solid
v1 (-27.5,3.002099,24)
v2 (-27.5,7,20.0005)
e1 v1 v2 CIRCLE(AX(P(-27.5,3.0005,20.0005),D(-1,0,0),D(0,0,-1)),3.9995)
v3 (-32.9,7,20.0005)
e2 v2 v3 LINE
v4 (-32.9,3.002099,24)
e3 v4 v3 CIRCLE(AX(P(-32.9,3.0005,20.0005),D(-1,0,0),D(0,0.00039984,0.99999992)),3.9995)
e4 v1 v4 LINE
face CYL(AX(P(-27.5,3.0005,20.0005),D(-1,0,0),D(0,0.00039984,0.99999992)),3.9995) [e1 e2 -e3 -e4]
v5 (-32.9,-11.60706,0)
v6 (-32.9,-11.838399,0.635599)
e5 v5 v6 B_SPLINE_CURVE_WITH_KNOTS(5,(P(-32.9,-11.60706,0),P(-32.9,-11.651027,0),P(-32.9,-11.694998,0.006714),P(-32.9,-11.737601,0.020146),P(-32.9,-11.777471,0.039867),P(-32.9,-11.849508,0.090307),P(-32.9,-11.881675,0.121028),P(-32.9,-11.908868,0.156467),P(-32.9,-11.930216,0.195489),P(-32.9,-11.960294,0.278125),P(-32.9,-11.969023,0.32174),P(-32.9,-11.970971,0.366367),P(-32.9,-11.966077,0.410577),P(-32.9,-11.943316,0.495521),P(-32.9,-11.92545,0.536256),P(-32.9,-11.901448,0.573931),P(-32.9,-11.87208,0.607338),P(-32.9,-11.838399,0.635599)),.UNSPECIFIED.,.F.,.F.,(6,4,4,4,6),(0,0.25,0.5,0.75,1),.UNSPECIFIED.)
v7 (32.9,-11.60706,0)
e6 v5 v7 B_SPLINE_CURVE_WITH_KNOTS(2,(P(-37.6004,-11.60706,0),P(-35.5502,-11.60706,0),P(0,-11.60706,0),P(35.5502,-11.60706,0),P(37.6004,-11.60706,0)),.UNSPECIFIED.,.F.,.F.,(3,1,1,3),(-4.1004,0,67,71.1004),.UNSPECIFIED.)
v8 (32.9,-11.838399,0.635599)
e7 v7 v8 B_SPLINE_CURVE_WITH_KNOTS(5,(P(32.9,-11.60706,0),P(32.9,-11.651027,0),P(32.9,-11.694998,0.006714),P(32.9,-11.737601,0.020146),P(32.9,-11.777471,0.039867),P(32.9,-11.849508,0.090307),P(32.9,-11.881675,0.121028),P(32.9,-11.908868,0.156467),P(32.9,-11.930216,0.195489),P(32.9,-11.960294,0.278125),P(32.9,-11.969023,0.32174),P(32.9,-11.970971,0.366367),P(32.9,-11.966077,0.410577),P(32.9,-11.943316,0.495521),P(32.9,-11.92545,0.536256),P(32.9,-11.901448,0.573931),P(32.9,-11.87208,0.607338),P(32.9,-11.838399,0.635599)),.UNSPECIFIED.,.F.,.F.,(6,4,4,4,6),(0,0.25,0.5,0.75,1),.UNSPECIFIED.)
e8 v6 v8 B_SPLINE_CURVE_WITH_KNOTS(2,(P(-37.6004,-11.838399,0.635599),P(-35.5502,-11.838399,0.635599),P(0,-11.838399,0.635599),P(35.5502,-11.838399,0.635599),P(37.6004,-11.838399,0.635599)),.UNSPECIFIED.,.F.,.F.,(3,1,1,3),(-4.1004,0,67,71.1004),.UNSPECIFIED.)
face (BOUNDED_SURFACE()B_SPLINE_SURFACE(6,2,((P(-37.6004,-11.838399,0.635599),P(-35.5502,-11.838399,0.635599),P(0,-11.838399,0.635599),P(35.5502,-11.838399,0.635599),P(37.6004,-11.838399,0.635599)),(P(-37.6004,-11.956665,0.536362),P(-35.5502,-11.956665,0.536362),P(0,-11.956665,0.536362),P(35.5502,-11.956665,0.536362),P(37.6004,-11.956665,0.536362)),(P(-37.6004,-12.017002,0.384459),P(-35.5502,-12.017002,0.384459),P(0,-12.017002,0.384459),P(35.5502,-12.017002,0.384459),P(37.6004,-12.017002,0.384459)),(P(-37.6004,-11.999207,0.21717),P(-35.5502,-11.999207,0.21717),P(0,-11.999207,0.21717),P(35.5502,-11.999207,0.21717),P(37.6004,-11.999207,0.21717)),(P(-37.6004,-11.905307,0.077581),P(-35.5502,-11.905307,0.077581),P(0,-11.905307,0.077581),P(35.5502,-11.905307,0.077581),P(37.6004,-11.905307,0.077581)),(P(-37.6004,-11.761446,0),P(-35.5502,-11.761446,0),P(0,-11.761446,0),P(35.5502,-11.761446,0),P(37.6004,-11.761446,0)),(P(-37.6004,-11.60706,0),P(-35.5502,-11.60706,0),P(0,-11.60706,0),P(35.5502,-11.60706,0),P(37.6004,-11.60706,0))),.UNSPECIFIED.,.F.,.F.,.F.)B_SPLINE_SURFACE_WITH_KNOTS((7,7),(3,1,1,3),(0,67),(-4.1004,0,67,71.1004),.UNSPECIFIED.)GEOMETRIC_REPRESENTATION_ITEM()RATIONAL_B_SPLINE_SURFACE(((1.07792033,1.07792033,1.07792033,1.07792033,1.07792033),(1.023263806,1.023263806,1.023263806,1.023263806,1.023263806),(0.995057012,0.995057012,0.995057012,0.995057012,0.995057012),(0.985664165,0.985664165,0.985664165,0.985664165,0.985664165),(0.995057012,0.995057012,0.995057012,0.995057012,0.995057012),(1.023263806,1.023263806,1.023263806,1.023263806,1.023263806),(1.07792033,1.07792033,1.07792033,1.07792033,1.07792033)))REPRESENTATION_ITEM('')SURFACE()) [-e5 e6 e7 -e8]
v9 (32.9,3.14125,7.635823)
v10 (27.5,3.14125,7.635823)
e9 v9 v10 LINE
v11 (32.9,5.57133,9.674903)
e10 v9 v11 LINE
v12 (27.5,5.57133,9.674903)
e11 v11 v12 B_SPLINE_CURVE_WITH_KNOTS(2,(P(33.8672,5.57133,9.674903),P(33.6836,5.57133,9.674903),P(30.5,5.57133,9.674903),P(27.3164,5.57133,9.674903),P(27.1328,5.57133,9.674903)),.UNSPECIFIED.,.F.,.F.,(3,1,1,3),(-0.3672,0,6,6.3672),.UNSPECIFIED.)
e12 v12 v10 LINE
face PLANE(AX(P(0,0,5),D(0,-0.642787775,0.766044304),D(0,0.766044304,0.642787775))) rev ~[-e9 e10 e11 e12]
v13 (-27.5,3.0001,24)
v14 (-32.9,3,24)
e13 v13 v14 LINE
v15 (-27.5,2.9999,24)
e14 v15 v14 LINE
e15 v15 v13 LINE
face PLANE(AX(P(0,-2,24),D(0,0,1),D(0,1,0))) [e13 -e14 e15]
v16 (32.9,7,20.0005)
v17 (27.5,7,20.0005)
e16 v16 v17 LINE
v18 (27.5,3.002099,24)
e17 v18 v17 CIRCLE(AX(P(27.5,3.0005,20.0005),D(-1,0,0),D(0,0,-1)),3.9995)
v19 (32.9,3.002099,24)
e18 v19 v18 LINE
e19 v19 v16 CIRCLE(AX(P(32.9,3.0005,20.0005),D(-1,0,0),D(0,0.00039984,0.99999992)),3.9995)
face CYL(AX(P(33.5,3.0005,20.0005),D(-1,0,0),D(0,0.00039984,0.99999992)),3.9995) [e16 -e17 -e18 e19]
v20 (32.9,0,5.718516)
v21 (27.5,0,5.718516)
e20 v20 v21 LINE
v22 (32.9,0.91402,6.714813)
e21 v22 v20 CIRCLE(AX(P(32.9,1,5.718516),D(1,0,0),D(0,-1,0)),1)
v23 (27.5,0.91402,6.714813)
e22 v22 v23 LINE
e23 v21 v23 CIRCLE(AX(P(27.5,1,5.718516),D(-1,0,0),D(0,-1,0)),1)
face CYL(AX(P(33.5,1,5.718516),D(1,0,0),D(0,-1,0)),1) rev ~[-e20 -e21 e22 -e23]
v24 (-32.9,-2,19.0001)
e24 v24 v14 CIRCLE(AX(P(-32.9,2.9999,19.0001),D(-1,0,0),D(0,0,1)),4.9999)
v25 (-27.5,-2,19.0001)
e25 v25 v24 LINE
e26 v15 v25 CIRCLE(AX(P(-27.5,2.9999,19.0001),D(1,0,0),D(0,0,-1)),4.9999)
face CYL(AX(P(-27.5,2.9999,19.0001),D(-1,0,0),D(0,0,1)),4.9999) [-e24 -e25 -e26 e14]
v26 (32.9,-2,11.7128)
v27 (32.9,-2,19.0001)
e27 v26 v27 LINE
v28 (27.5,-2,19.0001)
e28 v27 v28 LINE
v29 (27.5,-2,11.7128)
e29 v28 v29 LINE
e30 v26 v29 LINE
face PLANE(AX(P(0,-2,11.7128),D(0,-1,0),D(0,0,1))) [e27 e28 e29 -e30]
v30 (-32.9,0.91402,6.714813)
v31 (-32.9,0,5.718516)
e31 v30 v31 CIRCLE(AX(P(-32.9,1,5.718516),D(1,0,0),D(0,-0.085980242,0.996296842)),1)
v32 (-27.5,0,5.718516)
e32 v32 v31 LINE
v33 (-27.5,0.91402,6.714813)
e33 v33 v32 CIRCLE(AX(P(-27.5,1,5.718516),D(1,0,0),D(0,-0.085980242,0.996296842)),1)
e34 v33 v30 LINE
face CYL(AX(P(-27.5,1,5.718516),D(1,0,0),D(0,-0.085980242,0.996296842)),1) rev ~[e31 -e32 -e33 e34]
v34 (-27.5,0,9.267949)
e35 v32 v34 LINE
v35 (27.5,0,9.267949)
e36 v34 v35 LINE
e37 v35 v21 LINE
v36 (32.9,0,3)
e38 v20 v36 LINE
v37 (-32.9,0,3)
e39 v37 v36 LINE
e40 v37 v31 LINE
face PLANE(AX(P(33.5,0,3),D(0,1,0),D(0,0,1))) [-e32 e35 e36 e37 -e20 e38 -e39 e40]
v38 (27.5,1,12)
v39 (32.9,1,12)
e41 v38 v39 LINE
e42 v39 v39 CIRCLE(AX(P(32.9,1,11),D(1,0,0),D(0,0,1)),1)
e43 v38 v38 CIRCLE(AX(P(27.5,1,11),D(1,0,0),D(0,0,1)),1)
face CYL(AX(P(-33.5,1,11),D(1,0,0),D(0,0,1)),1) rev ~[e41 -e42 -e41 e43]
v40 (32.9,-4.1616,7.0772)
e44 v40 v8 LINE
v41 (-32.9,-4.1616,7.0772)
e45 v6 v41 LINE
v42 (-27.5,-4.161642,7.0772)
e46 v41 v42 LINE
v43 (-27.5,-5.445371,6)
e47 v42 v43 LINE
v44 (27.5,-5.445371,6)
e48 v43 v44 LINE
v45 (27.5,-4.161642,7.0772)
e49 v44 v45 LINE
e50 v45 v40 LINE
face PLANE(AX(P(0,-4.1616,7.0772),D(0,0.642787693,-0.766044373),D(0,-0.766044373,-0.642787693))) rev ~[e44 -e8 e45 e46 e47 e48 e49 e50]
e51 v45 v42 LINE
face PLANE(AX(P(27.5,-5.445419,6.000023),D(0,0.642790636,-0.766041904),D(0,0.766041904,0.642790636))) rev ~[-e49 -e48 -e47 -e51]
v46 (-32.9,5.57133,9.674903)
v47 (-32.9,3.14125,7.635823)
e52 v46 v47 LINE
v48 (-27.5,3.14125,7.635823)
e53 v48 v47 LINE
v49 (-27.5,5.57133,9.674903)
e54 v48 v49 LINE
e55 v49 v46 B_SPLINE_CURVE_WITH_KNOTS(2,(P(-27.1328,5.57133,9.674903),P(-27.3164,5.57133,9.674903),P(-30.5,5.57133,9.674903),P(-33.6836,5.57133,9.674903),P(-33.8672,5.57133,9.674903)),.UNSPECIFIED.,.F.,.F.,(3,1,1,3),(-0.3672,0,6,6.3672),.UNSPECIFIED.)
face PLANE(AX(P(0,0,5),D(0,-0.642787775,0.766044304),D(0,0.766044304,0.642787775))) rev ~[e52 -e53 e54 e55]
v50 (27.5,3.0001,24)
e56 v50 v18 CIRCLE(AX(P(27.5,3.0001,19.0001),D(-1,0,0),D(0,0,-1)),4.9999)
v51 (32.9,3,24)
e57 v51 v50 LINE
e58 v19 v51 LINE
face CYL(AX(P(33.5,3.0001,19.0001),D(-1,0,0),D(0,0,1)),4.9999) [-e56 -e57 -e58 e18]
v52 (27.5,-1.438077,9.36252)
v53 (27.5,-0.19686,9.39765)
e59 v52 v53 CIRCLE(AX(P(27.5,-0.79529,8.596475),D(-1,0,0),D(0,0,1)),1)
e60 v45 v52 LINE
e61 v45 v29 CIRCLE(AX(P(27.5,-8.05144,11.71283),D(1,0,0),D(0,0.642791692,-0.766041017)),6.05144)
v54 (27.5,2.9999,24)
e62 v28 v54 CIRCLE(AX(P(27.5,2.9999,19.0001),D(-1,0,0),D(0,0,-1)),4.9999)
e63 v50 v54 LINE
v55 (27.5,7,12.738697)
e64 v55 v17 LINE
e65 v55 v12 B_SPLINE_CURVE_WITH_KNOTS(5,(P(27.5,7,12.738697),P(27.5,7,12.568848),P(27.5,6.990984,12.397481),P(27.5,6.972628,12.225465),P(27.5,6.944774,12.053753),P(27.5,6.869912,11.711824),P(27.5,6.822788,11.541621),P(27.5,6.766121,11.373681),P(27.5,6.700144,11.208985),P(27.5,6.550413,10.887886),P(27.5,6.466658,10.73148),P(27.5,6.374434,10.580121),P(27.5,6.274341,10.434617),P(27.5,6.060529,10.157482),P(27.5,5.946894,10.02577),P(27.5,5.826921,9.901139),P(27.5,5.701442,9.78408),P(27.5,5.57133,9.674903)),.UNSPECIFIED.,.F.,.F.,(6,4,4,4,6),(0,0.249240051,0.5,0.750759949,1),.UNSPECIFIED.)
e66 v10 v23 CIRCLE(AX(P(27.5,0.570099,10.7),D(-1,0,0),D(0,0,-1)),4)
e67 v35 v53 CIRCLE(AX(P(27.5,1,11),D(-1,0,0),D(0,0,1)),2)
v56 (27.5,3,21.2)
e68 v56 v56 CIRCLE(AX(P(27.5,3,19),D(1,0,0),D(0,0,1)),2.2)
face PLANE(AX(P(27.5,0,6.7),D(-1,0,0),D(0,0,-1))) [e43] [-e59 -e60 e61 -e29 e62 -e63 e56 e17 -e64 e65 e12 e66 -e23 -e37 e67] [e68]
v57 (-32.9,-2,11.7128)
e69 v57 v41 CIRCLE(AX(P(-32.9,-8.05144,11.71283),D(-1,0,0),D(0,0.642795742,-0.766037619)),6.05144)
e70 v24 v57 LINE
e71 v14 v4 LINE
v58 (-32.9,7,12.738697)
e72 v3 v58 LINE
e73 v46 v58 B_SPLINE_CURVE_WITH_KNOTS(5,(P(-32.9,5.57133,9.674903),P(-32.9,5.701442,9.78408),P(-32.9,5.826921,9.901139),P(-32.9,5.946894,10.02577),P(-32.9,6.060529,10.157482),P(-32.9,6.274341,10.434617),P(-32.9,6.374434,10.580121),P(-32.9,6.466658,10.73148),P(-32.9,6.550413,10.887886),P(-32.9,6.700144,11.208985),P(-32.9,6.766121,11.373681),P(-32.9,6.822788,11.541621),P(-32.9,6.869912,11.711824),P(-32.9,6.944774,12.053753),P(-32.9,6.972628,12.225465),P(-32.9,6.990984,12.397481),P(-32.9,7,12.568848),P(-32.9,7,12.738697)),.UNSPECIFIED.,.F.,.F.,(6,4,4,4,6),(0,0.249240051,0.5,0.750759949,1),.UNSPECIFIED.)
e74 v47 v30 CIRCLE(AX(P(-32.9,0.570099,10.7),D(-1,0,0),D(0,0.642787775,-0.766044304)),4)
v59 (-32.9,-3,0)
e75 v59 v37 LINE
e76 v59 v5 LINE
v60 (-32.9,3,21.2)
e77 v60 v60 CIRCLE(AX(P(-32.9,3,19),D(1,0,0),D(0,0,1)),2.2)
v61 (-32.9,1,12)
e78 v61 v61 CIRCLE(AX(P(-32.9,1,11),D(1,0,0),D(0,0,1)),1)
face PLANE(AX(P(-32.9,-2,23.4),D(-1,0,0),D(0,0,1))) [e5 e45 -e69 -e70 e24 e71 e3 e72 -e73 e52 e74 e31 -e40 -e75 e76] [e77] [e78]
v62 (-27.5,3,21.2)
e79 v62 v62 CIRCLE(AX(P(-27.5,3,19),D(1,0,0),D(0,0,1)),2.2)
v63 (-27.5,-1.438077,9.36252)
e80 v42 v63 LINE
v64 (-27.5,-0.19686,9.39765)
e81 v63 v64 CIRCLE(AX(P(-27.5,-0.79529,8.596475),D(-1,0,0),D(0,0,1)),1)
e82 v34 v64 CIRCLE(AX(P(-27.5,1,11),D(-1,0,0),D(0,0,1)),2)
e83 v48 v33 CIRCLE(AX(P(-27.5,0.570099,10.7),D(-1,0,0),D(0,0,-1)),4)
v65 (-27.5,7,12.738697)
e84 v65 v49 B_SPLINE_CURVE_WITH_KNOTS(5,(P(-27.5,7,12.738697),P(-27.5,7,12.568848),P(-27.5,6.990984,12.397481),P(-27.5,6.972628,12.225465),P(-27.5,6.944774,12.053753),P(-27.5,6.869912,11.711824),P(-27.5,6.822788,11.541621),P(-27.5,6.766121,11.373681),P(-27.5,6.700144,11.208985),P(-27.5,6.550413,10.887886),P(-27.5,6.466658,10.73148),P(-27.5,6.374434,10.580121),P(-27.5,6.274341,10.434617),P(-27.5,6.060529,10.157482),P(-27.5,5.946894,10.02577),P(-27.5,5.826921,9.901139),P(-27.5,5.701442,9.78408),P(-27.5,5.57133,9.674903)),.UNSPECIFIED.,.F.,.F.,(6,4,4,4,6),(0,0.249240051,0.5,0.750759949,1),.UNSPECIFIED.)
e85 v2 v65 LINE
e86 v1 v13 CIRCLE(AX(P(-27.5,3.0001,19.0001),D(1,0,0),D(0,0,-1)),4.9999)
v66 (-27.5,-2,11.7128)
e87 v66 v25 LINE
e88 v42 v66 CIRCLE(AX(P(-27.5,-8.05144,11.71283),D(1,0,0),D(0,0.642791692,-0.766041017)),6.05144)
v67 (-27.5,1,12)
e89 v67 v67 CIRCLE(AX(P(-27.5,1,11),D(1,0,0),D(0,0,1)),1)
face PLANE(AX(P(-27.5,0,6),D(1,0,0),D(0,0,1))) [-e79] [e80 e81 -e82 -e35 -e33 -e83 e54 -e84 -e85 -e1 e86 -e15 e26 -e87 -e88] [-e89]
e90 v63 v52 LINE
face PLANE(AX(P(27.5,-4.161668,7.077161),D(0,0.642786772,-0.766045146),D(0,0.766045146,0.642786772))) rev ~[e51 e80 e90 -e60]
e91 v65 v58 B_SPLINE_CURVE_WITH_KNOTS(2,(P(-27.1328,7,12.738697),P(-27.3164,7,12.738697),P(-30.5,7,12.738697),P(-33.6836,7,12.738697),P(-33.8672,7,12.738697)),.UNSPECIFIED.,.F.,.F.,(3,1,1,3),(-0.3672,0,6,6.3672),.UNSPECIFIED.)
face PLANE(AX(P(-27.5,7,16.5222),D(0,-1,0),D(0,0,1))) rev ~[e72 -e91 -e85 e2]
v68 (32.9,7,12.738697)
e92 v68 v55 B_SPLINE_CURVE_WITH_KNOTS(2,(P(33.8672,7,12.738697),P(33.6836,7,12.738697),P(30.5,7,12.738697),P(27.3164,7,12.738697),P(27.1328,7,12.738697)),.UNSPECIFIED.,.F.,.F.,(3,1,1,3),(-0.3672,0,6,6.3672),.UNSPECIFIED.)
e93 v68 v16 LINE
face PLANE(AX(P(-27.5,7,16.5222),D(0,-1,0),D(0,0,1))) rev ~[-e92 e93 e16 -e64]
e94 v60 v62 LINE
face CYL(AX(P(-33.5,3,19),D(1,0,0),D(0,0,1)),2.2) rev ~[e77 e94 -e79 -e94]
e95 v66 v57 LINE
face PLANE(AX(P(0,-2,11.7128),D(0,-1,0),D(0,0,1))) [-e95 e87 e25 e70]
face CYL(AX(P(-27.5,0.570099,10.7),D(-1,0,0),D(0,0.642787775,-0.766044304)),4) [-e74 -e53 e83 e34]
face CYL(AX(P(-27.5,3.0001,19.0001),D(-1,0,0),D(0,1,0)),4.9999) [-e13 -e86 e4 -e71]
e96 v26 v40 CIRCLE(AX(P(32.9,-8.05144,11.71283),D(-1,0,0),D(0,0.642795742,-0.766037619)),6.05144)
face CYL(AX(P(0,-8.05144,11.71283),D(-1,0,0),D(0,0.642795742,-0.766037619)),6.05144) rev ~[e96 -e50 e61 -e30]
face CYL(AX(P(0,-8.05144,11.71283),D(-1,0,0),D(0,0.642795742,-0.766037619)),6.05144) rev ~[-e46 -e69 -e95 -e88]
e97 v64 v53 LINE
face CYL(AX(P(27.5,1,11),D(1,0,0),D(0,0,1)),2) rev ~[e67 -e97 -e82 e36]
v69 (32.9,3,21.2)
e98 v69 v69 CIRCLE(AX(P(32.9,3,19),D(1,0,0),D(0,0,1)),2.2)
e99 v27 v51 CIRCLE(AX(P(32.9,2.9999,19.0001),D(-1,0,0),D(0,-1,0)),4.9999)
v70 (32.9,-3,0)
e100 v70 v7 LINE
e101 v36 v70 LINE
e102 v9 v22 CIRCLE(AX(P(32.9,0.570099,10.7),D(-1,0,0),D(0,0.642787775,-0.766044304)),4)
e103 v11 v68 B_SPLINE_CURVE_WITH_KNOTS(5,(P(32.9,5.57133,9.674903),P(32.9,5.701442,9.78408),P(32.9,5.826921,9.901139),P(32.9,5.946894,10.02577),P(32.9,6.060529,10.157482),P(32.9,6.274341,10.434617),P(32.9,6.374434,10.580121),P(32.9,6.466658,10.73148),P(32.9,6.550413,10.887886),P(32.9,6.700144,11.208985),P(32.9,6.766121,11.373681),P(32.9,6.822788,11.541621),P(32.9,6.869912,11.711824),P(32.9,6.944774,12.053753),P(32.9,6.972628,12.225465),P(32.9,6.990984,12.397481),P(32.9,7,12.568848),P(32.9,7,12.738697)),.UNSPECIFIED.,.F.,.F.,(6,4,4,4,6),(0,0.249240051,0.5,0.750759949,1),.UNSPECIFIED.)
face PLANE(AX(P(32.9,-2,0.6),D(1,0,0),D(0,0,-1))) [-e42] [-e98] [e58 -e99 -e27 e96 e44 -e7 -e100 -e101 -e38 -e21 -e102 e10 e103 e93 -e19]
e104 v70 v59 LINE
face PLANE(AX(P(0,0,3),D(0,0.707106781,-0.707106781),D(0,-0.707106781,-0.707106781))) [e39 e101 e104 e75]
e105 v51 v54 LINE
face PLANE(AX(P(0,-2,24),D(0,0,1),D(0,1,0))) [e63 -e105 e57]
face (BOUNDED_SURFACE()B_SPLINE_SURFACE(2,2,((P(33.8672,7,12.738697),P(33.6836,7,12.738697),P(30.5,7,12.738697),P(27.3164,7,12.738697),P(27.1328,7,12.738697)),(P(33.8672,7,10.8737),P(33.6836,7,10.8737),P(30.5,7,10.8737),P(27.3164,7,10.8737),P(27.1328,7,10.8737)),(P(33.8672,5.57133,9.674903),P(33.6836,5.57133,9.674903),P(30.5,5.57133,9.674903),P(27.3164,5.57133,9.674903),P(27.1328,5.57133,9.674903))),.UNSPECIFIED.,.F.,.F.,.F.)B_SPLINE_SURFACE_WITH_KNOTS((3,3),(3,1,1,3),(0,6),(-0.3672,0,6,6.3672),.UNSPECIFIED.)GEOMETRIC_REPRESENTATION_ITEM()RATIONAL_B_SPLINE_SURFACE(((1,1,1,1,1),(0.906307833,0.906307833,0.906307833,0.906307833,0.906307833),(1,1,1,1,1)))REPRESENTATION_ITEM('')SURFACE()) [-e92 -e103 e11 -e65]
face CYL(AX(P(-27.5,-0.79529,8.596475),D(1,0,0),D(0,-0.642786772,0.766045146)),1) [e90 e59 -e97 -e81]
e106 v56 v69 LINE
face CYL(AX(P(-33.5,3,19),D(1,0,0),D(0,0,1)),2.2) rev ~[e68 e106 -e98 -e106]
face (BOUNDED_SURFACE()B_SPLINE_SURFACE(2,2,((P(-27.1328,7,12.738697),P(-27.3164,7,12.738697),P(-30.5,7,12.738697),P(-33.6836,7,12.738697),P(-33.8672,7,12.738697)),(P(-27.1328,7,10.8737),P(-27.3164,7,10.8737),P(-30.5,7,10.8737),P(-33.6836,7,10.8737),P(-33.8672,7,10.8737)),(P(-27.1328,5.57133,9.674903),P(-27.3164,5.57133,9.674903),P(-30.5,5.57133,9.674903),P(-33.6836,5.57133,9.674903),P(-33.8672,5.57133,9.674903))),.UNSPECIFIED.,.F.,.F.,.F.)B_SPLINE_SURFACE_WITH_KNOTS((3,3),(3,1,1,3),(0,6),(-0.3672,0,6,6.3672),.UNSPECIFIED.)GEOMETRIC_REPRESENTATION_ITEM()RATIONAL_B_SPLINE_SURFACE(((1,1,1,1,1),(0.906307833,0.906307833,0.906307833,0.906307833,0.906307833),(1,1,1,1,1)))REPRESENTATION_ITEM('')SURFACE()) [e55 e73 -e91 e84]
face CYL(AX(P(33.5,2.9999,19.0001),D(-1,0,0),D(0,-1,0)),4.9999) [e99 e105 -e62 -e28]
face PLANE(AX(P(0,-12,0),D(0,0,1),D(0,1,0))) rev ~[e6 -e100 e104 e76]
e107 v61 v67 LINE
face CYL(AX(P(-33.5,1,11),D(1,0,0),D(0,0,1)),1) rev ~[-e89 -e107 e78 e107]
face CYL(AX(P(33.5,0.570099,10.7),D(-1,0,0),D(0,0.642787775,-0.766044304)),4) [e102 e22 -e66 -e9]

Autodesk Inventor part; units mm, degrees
ref_plane "YZ Plane" through (0, 0, 0) normal (1, 0, 0) x (0, 1, 0)
ref_plane "XZ Plane" through (0, 0, 0) normal (0, 1, 0) x (-1, 0, 0)
ref_plane "XY Plane" through (0, 0, 0) normal (0, 0, 1) x (1, 0, 0)
sketch "Skizze1" plane through (0, 0, 0) normal (1, 0, 0) x (0, 1, 0)
  line L0 (-4.1616, 7.0772) -> (-12, 0.5)
  line L1 (-12, 0) -> (-3, 0)
  line L2 (-12, 0.5) -> (-12, 0)
  line L3 (0, 5) -> (8, 11.7128)
  circle A0 centre (3, 19) radius 0.5
  line L4 (-2, 11.7128) -> (-2, 24)
  line L5 (-2, 24) -> (8, 24)
  line L6 (8, 24) -> (8, 11.7128)
  line L7 (0, 3) -> (-3, 0)
  line L8 (8, 11.7128) -> (-2, 11.7128) construction
  arc A1 (-4.1616, 7.0772) -> (-2, 11.7128) centre (-8.0514, 11.7128) ccw
  line L9 (0, 5) -> (0, 3)
  line L10 (3, 19) -> (3, 0) construction
  point P0 (0, 0)
  dimension "d40" = 0.5
  dimension "d44" = 1
  dimension "d59" = 10
  dimension "d60" = 45
  dimension "d61" = 5
  dimension "d63" = 40
  dimension "d78" = 3
  dimension "d79" = 12
  dimension "d80" = 0
  dimension "d81" = 19
  dimension "d82" = 5
  dimension "d83" = 3
extrude "Extrusion1" add sketch "Skizze1" along normal mid plane 67
sketch "Skizze6" plane through (0, 0, 0) normal (0, 1, 0) x (-1, 0, 0)
  line L0 (33.5, 0.5) -> (-33.5, 0.5) projected
  line L1 (-33.5, 7.0772) -> (-33.5, 0.5) projected
  line L2 (33.5, 0.5) -> (33.5, 7.0772) projected
  line L3 (-27.5, 6) -> (27.5, 6)
  line L4 (27.5, 6) -> (27.5, 31)
  line L5 (27.5, 31) -> (-27.5, 31)
  line L6 (-27.5, 31) -> (-27.5, 6)
  line L7 (0, -6.2) -> (0, 37.2) projected
  line L8 (33.5, 0) -> (-33.5, 0) projected
  line L9 (-33.5, 0) -> (33.5, 0) projected
  point P0 (0, 0)
  point P1 (-33, 10)
  point P2 (33, 10)
  dimension "d45" = 6
  dimension "d46" = 25
  dimension "d50" = 6
extrude "Extrusion4" cut sketch "Skizze6" along normal mid plane 16
sketch "Skizze3" plane through (-33.5, 0, 0) normal (-1, 0, 0) x (0, 0, 1)
  line L0 (0, -3) -> (0, -12) projected
  line L1 (0.5, -12) -> (7.0772, -4.1616) projected
  line L2 (0, -12) -> (0, 0) construction
  line L3 (0, 12) -> (0, -16) projected
  line L4 (0, -12) -> (0.5, -12) projected
  line L5 (11.7128, 8) -> (5, 0) projected
  line L6 (11.7128, -2) -> (24, -2) projected
  line L7 (24, -2) -> (24, 8) projected
  line L8 (24, 8) -> (11.7128, 8) projected
  circle A0 centre (19, 3) radius 0.5 projected
  line L9 (3, 0) -> (0, -3) projected
  arc A1 (11.7128, -2) -> (7.0772, -4.1616) centre (11.7128, -8.0514) ccw projected
  line L10 (5, 0) -> (3, 0) projected
hole "Bohrung1" at (-33.5, 3, 19) direction (1, 0, 0) diameter 4.4 end through all
sketch "Skizze4" plane through (-33.5, 0, 0) normal (-1, 0, 0) x (0, 0, 1)
  line L0 (0, 12) -> (0, -16) projected
  line L1 (-5.8, 0) -> (34.8, 0) projected
  point P0 (29, 0)
  point P1 (11, 1)
  dimension "d38" = 11
  dimension "d84" = 1
hole "Bohrung2" at (-33.5, 1, 11) direction (1, 0, 0) diameter 2 end through all
fillet "Rundung2" radius 5 6 edges at (30.5, -2, 24) (30.5, 8, 24) (-30.5, 8, 24) (-30.5, -2, 24) (30.5, 8, 11.7128) (-30.5, 8, 11.7128)
fillet "Rundung8" radius 0.36 2 edges at (0, -12, 0.5) (0, -12, 0)
sketch "Skizze7" plane through (-27.5, 1.1918, 6) normal (0, 0, 1) x (1, 0, 0)
  line L0 (0, 0) -> (55, 0) projected
  line L1 (0, 0) -> (0, -6.6371) projected
  line L2 (55, -6.6371) -> (0, -6.6371) projected
  line L3 (55, -6.6371) -> (55, 0) projected
  line L4 (-19.4, -1.1918) -> (74.4, -1.1918) projected
  point P0 (27.5, -1.1918)
  point P1 (0, -1.1918)
  point P2 (55, -1.1918)
extrude "Extrusion5" cut sketch "Skizze7" against normal through all contours L0 L3 L4 L1
sketch "Skizze8" plane through (-27.5, -5.4454, 6) normal (1, 0, 0) x (0, 0, -1)
  line L0 (-8.0443, 13.4454) -> (-13, 13.4454) projected
  line L1 (-10.5222, 13.4454) -> (-10.5222, 12.4454)
  line L2 (-10.5222, 12.4454) -> (-17.4656, 12.4454)
  line L3 (-17.4656, 12.4454) -> (-4.9838, 12.4454)
  line L4 (-4.9838, 12.4454) -> (-4.9838, 14.4351)
  line L5 (-4.9838, 14.4351) -> (-17.4656, 14.4351)
  line L6 (-17.4656, 14.4351) -> (-17.4656, 12.4454)
  point P0 (6, 5.4454)
  dimension "d90" = 1
extrude "Extrusion6" cut sketch "Skizze8" along normal mid plane 200
fillet "Rundung10" radius 4 4 edges at (30.5, 7, 11.0443) (30.5, 7, 22.0001) (-30.5, 7, 22.0001) (-30.5, 7, 11.0443)
sketch "Skizze9" plane through (-27.5, -2, 19) normal (1, 0, 0) x (0, 0, -1)
  line L0 (9.3252, 7.5712) -> (14, 2) projected
  line L1 (14, 2) -> (14, 3)
  line L2 (14, 3) -> (12.8, 3)
  line L3 (12.8, 3) -> (14, 3)
  line L4 (14, 3) -> (14, 4.2192)
  line L5 (14, 4.2192) -> (12.8, 4.2192)
  line L6 (12.8, 4.2192) -> (12.8, 3)
  line L7 (12.3, 4.7192) -> (14.5, 4.7192)
  line L8 (14.5, 4.7192) -> (14.5, 2.5)
  line L9 (14.5, 2.5) -> (12.3, 2.5)
  line L10 (12.3, 2.5) -> (12.3, 4.7192)
  line L11 (12.3, 2.5) -> (12.3, 1.2569)
  line L12 (12.3, 1.2569) -> (14.6235, 1.2569)
  line L13 (12.3, 1.2569) -> (11.55, 1.2569)
  line L14 (11.55, 1.2569) -> (11.55, 4.7192)
  line L15 (11.55, 4.7192) -> (12.3, 4.7192)
  point P0 (19, 2)
  point P1 (13.5805, 2.5)
  point P2 (12.3, 4.026)
  point P3 (11.55, 4.45)
  point P4 (13.1609, 3)
  point P5 (14, 2.5)
  dimension "d95" = 1
  dimension "d96" = 1.2
  dimension "d97" = 0.5
  dimension "d103" = 0.75
extrude "Extrusion7" cut sketch "Skizze9" along normal mid plane 200 contours L10 L7 L8 L9 L1 L4 L5 L6 L0 | L0 L6 L2 L9 L10 | L6 L5 L4 L2 L0 | L0 L2 L6 | L2 L1 L9 L0 | L9 L1 L0
fillet "Rundung12" radius 4 2 edges at (30.5, 2.026, 6.7) (-30.5, 2.026, 6.7)
sketch "Skizze16" plane through (-27.5, 0, 6) normal (0, 0, 1) x (1, 0, 0)
  line L0 (27.5, 0) -> (27.5, -5.4454)
  line L1 (55, -5.4454) -> (0, -5.4454) projected
  line L2 (27.5, -5.4454) -> (27.5, -26.9454)
  circle A0 centre (27.5, -26.9454) radius 21.5
  circle A1 centre (27.5, -26.9454) radius 24.5
  line L3 (0, -5.4454) -> (0, 0)
  line L4 (-6, 0) -> (61, 0) projected
  line L5 (0, 0) -> (55, 0)
  line L6 (55, 0) -> (55, -5.4454)
  line L7 (55, -5.4454) -> (0, -5.4454)
  line L8 (0, -5.4454) -> (0, 0)
  point P0 (15.7527, -5.4454)
  point P1 (39.2473, -5.4454)
  point P2 (55, 0)
  dimension "d122" = 21.5
  dimension "d123" = 3
extrude "Extrusion11" add sketch "Skizze16" along normal blind 5 contours L4 L6 L1 A1 L0 | L0 A1 L1 L3 L4 | A1 L1 L0 | L0 L1 A1
sketch "Skizze18" plane through (27.5, -5.4454, 11) normal (1, 0, 0) x (0, 0, -1)
  line L0 (10.3642, -6.3928) -> (3.9228, 1.2837) projected
  line L1 (10.3642, -6.3928) -> (0, 5.9588)
  line L2 (0, 0) -> (0, 3.4032) projected
  line L3 (0, 5.9588) -> (0, 0)
  line L4 (0, 0) -> (5, 0)
  point P0 (11, 5.4454)
  point P1 (5, 0)
extrude "Extrusion12" cut sketch "Skizze18" against normal up to surface (55 mm away)
sketch "Skizze19" plane through (27.5, -2, 11.7128) normal (-1, 0, 0) x (0, 0, 1)
  circle A0 centre (-0.7128, 3) radius 1 projected
  circle A1 centre (-0.7128, 3) radius 2
  point P0 (-11.7128, 2)
  dimension "d131" = 4
extrude "Extrusion13" cut sketch "Skizze19" along normal up to surface (55 mm away) contours A0 | A1
sketch "Skizze22" plane through (33.5, 0, 0) normal (1, 0, 0) x (0, 0, -1)
  line L0 (0, -3) -> (-3, 0) projected
  line L1 (-5.4195, 0.5) -> (-6.7, 0.5) projected
  line L2 (-3, 0) -> (-6.7, 0)
  line L3 (-6.7, 0) -> (-6.7, 0.5)
  line L4 (-6.7, 0.5) -> (-3, 0.5)
  line L5 (-3, 0.5) -> (-3, 0)
  point P0 (0, 0)
  point P1 (-5.4195, 0.5)
extrude "Extrusion14" cut sketch "Skizze22" against normal up to surface (67 mm away)
fillet "Rundung22" radius 1 2 edges at (30.5, 0, 6.7) (-30.5, 0, 6.7)
sketch "Skizze23" plane through (-33.5, -2, 11.7128) normal (0, -1, 0) x (1, 0, 0)
  line L0 (0, 8.2872) -> (0, 12.2872) projected
  line L1 (0, 12.2872) -> (67, 12.2872)
  line L2 (67, 12.2872) -> (67, -11.7128)
  line L3 (67, -11.7128) -> (0, -11.7128)
  line L4 (0, -11.7128) -> (0, 12.2872)
  line L5 (66.4, 11.6872) -> (0.6, 11.6872)
  line L6 (0.6, 11.6872) -> (0.6, -11.1128)
  line L7 (0.6, -11.1128) -> (66.4, -11.1128)
  line L8 (66.4, -11.1128) -> (66.4, 11.6872)
  line L9 (66.4, 11.6872) -> (66.4, 12.2872)
  line L10 (66.4, -11.1128) -> (66.4, -11.7128)
  line L11 (0.6, -11.1128) -> (0.6, -11.7128)
  line L12 (0.6, 11.6872) -> (0.6, 12.2872)
  dimension "d146" = 0.6
extrude "Extrusion15" cut sketch "Skizze23" along normal mid plane 100 contours L0 L1 L12 L6 L11 L3 L4 | L1 L2 L3 L10 L8 L9
fillet "Rundung23" radius 1 1 edges at (0, -0.7143, 9.9698)
properties part number "Schaufel" material "Aluminium 6061"
